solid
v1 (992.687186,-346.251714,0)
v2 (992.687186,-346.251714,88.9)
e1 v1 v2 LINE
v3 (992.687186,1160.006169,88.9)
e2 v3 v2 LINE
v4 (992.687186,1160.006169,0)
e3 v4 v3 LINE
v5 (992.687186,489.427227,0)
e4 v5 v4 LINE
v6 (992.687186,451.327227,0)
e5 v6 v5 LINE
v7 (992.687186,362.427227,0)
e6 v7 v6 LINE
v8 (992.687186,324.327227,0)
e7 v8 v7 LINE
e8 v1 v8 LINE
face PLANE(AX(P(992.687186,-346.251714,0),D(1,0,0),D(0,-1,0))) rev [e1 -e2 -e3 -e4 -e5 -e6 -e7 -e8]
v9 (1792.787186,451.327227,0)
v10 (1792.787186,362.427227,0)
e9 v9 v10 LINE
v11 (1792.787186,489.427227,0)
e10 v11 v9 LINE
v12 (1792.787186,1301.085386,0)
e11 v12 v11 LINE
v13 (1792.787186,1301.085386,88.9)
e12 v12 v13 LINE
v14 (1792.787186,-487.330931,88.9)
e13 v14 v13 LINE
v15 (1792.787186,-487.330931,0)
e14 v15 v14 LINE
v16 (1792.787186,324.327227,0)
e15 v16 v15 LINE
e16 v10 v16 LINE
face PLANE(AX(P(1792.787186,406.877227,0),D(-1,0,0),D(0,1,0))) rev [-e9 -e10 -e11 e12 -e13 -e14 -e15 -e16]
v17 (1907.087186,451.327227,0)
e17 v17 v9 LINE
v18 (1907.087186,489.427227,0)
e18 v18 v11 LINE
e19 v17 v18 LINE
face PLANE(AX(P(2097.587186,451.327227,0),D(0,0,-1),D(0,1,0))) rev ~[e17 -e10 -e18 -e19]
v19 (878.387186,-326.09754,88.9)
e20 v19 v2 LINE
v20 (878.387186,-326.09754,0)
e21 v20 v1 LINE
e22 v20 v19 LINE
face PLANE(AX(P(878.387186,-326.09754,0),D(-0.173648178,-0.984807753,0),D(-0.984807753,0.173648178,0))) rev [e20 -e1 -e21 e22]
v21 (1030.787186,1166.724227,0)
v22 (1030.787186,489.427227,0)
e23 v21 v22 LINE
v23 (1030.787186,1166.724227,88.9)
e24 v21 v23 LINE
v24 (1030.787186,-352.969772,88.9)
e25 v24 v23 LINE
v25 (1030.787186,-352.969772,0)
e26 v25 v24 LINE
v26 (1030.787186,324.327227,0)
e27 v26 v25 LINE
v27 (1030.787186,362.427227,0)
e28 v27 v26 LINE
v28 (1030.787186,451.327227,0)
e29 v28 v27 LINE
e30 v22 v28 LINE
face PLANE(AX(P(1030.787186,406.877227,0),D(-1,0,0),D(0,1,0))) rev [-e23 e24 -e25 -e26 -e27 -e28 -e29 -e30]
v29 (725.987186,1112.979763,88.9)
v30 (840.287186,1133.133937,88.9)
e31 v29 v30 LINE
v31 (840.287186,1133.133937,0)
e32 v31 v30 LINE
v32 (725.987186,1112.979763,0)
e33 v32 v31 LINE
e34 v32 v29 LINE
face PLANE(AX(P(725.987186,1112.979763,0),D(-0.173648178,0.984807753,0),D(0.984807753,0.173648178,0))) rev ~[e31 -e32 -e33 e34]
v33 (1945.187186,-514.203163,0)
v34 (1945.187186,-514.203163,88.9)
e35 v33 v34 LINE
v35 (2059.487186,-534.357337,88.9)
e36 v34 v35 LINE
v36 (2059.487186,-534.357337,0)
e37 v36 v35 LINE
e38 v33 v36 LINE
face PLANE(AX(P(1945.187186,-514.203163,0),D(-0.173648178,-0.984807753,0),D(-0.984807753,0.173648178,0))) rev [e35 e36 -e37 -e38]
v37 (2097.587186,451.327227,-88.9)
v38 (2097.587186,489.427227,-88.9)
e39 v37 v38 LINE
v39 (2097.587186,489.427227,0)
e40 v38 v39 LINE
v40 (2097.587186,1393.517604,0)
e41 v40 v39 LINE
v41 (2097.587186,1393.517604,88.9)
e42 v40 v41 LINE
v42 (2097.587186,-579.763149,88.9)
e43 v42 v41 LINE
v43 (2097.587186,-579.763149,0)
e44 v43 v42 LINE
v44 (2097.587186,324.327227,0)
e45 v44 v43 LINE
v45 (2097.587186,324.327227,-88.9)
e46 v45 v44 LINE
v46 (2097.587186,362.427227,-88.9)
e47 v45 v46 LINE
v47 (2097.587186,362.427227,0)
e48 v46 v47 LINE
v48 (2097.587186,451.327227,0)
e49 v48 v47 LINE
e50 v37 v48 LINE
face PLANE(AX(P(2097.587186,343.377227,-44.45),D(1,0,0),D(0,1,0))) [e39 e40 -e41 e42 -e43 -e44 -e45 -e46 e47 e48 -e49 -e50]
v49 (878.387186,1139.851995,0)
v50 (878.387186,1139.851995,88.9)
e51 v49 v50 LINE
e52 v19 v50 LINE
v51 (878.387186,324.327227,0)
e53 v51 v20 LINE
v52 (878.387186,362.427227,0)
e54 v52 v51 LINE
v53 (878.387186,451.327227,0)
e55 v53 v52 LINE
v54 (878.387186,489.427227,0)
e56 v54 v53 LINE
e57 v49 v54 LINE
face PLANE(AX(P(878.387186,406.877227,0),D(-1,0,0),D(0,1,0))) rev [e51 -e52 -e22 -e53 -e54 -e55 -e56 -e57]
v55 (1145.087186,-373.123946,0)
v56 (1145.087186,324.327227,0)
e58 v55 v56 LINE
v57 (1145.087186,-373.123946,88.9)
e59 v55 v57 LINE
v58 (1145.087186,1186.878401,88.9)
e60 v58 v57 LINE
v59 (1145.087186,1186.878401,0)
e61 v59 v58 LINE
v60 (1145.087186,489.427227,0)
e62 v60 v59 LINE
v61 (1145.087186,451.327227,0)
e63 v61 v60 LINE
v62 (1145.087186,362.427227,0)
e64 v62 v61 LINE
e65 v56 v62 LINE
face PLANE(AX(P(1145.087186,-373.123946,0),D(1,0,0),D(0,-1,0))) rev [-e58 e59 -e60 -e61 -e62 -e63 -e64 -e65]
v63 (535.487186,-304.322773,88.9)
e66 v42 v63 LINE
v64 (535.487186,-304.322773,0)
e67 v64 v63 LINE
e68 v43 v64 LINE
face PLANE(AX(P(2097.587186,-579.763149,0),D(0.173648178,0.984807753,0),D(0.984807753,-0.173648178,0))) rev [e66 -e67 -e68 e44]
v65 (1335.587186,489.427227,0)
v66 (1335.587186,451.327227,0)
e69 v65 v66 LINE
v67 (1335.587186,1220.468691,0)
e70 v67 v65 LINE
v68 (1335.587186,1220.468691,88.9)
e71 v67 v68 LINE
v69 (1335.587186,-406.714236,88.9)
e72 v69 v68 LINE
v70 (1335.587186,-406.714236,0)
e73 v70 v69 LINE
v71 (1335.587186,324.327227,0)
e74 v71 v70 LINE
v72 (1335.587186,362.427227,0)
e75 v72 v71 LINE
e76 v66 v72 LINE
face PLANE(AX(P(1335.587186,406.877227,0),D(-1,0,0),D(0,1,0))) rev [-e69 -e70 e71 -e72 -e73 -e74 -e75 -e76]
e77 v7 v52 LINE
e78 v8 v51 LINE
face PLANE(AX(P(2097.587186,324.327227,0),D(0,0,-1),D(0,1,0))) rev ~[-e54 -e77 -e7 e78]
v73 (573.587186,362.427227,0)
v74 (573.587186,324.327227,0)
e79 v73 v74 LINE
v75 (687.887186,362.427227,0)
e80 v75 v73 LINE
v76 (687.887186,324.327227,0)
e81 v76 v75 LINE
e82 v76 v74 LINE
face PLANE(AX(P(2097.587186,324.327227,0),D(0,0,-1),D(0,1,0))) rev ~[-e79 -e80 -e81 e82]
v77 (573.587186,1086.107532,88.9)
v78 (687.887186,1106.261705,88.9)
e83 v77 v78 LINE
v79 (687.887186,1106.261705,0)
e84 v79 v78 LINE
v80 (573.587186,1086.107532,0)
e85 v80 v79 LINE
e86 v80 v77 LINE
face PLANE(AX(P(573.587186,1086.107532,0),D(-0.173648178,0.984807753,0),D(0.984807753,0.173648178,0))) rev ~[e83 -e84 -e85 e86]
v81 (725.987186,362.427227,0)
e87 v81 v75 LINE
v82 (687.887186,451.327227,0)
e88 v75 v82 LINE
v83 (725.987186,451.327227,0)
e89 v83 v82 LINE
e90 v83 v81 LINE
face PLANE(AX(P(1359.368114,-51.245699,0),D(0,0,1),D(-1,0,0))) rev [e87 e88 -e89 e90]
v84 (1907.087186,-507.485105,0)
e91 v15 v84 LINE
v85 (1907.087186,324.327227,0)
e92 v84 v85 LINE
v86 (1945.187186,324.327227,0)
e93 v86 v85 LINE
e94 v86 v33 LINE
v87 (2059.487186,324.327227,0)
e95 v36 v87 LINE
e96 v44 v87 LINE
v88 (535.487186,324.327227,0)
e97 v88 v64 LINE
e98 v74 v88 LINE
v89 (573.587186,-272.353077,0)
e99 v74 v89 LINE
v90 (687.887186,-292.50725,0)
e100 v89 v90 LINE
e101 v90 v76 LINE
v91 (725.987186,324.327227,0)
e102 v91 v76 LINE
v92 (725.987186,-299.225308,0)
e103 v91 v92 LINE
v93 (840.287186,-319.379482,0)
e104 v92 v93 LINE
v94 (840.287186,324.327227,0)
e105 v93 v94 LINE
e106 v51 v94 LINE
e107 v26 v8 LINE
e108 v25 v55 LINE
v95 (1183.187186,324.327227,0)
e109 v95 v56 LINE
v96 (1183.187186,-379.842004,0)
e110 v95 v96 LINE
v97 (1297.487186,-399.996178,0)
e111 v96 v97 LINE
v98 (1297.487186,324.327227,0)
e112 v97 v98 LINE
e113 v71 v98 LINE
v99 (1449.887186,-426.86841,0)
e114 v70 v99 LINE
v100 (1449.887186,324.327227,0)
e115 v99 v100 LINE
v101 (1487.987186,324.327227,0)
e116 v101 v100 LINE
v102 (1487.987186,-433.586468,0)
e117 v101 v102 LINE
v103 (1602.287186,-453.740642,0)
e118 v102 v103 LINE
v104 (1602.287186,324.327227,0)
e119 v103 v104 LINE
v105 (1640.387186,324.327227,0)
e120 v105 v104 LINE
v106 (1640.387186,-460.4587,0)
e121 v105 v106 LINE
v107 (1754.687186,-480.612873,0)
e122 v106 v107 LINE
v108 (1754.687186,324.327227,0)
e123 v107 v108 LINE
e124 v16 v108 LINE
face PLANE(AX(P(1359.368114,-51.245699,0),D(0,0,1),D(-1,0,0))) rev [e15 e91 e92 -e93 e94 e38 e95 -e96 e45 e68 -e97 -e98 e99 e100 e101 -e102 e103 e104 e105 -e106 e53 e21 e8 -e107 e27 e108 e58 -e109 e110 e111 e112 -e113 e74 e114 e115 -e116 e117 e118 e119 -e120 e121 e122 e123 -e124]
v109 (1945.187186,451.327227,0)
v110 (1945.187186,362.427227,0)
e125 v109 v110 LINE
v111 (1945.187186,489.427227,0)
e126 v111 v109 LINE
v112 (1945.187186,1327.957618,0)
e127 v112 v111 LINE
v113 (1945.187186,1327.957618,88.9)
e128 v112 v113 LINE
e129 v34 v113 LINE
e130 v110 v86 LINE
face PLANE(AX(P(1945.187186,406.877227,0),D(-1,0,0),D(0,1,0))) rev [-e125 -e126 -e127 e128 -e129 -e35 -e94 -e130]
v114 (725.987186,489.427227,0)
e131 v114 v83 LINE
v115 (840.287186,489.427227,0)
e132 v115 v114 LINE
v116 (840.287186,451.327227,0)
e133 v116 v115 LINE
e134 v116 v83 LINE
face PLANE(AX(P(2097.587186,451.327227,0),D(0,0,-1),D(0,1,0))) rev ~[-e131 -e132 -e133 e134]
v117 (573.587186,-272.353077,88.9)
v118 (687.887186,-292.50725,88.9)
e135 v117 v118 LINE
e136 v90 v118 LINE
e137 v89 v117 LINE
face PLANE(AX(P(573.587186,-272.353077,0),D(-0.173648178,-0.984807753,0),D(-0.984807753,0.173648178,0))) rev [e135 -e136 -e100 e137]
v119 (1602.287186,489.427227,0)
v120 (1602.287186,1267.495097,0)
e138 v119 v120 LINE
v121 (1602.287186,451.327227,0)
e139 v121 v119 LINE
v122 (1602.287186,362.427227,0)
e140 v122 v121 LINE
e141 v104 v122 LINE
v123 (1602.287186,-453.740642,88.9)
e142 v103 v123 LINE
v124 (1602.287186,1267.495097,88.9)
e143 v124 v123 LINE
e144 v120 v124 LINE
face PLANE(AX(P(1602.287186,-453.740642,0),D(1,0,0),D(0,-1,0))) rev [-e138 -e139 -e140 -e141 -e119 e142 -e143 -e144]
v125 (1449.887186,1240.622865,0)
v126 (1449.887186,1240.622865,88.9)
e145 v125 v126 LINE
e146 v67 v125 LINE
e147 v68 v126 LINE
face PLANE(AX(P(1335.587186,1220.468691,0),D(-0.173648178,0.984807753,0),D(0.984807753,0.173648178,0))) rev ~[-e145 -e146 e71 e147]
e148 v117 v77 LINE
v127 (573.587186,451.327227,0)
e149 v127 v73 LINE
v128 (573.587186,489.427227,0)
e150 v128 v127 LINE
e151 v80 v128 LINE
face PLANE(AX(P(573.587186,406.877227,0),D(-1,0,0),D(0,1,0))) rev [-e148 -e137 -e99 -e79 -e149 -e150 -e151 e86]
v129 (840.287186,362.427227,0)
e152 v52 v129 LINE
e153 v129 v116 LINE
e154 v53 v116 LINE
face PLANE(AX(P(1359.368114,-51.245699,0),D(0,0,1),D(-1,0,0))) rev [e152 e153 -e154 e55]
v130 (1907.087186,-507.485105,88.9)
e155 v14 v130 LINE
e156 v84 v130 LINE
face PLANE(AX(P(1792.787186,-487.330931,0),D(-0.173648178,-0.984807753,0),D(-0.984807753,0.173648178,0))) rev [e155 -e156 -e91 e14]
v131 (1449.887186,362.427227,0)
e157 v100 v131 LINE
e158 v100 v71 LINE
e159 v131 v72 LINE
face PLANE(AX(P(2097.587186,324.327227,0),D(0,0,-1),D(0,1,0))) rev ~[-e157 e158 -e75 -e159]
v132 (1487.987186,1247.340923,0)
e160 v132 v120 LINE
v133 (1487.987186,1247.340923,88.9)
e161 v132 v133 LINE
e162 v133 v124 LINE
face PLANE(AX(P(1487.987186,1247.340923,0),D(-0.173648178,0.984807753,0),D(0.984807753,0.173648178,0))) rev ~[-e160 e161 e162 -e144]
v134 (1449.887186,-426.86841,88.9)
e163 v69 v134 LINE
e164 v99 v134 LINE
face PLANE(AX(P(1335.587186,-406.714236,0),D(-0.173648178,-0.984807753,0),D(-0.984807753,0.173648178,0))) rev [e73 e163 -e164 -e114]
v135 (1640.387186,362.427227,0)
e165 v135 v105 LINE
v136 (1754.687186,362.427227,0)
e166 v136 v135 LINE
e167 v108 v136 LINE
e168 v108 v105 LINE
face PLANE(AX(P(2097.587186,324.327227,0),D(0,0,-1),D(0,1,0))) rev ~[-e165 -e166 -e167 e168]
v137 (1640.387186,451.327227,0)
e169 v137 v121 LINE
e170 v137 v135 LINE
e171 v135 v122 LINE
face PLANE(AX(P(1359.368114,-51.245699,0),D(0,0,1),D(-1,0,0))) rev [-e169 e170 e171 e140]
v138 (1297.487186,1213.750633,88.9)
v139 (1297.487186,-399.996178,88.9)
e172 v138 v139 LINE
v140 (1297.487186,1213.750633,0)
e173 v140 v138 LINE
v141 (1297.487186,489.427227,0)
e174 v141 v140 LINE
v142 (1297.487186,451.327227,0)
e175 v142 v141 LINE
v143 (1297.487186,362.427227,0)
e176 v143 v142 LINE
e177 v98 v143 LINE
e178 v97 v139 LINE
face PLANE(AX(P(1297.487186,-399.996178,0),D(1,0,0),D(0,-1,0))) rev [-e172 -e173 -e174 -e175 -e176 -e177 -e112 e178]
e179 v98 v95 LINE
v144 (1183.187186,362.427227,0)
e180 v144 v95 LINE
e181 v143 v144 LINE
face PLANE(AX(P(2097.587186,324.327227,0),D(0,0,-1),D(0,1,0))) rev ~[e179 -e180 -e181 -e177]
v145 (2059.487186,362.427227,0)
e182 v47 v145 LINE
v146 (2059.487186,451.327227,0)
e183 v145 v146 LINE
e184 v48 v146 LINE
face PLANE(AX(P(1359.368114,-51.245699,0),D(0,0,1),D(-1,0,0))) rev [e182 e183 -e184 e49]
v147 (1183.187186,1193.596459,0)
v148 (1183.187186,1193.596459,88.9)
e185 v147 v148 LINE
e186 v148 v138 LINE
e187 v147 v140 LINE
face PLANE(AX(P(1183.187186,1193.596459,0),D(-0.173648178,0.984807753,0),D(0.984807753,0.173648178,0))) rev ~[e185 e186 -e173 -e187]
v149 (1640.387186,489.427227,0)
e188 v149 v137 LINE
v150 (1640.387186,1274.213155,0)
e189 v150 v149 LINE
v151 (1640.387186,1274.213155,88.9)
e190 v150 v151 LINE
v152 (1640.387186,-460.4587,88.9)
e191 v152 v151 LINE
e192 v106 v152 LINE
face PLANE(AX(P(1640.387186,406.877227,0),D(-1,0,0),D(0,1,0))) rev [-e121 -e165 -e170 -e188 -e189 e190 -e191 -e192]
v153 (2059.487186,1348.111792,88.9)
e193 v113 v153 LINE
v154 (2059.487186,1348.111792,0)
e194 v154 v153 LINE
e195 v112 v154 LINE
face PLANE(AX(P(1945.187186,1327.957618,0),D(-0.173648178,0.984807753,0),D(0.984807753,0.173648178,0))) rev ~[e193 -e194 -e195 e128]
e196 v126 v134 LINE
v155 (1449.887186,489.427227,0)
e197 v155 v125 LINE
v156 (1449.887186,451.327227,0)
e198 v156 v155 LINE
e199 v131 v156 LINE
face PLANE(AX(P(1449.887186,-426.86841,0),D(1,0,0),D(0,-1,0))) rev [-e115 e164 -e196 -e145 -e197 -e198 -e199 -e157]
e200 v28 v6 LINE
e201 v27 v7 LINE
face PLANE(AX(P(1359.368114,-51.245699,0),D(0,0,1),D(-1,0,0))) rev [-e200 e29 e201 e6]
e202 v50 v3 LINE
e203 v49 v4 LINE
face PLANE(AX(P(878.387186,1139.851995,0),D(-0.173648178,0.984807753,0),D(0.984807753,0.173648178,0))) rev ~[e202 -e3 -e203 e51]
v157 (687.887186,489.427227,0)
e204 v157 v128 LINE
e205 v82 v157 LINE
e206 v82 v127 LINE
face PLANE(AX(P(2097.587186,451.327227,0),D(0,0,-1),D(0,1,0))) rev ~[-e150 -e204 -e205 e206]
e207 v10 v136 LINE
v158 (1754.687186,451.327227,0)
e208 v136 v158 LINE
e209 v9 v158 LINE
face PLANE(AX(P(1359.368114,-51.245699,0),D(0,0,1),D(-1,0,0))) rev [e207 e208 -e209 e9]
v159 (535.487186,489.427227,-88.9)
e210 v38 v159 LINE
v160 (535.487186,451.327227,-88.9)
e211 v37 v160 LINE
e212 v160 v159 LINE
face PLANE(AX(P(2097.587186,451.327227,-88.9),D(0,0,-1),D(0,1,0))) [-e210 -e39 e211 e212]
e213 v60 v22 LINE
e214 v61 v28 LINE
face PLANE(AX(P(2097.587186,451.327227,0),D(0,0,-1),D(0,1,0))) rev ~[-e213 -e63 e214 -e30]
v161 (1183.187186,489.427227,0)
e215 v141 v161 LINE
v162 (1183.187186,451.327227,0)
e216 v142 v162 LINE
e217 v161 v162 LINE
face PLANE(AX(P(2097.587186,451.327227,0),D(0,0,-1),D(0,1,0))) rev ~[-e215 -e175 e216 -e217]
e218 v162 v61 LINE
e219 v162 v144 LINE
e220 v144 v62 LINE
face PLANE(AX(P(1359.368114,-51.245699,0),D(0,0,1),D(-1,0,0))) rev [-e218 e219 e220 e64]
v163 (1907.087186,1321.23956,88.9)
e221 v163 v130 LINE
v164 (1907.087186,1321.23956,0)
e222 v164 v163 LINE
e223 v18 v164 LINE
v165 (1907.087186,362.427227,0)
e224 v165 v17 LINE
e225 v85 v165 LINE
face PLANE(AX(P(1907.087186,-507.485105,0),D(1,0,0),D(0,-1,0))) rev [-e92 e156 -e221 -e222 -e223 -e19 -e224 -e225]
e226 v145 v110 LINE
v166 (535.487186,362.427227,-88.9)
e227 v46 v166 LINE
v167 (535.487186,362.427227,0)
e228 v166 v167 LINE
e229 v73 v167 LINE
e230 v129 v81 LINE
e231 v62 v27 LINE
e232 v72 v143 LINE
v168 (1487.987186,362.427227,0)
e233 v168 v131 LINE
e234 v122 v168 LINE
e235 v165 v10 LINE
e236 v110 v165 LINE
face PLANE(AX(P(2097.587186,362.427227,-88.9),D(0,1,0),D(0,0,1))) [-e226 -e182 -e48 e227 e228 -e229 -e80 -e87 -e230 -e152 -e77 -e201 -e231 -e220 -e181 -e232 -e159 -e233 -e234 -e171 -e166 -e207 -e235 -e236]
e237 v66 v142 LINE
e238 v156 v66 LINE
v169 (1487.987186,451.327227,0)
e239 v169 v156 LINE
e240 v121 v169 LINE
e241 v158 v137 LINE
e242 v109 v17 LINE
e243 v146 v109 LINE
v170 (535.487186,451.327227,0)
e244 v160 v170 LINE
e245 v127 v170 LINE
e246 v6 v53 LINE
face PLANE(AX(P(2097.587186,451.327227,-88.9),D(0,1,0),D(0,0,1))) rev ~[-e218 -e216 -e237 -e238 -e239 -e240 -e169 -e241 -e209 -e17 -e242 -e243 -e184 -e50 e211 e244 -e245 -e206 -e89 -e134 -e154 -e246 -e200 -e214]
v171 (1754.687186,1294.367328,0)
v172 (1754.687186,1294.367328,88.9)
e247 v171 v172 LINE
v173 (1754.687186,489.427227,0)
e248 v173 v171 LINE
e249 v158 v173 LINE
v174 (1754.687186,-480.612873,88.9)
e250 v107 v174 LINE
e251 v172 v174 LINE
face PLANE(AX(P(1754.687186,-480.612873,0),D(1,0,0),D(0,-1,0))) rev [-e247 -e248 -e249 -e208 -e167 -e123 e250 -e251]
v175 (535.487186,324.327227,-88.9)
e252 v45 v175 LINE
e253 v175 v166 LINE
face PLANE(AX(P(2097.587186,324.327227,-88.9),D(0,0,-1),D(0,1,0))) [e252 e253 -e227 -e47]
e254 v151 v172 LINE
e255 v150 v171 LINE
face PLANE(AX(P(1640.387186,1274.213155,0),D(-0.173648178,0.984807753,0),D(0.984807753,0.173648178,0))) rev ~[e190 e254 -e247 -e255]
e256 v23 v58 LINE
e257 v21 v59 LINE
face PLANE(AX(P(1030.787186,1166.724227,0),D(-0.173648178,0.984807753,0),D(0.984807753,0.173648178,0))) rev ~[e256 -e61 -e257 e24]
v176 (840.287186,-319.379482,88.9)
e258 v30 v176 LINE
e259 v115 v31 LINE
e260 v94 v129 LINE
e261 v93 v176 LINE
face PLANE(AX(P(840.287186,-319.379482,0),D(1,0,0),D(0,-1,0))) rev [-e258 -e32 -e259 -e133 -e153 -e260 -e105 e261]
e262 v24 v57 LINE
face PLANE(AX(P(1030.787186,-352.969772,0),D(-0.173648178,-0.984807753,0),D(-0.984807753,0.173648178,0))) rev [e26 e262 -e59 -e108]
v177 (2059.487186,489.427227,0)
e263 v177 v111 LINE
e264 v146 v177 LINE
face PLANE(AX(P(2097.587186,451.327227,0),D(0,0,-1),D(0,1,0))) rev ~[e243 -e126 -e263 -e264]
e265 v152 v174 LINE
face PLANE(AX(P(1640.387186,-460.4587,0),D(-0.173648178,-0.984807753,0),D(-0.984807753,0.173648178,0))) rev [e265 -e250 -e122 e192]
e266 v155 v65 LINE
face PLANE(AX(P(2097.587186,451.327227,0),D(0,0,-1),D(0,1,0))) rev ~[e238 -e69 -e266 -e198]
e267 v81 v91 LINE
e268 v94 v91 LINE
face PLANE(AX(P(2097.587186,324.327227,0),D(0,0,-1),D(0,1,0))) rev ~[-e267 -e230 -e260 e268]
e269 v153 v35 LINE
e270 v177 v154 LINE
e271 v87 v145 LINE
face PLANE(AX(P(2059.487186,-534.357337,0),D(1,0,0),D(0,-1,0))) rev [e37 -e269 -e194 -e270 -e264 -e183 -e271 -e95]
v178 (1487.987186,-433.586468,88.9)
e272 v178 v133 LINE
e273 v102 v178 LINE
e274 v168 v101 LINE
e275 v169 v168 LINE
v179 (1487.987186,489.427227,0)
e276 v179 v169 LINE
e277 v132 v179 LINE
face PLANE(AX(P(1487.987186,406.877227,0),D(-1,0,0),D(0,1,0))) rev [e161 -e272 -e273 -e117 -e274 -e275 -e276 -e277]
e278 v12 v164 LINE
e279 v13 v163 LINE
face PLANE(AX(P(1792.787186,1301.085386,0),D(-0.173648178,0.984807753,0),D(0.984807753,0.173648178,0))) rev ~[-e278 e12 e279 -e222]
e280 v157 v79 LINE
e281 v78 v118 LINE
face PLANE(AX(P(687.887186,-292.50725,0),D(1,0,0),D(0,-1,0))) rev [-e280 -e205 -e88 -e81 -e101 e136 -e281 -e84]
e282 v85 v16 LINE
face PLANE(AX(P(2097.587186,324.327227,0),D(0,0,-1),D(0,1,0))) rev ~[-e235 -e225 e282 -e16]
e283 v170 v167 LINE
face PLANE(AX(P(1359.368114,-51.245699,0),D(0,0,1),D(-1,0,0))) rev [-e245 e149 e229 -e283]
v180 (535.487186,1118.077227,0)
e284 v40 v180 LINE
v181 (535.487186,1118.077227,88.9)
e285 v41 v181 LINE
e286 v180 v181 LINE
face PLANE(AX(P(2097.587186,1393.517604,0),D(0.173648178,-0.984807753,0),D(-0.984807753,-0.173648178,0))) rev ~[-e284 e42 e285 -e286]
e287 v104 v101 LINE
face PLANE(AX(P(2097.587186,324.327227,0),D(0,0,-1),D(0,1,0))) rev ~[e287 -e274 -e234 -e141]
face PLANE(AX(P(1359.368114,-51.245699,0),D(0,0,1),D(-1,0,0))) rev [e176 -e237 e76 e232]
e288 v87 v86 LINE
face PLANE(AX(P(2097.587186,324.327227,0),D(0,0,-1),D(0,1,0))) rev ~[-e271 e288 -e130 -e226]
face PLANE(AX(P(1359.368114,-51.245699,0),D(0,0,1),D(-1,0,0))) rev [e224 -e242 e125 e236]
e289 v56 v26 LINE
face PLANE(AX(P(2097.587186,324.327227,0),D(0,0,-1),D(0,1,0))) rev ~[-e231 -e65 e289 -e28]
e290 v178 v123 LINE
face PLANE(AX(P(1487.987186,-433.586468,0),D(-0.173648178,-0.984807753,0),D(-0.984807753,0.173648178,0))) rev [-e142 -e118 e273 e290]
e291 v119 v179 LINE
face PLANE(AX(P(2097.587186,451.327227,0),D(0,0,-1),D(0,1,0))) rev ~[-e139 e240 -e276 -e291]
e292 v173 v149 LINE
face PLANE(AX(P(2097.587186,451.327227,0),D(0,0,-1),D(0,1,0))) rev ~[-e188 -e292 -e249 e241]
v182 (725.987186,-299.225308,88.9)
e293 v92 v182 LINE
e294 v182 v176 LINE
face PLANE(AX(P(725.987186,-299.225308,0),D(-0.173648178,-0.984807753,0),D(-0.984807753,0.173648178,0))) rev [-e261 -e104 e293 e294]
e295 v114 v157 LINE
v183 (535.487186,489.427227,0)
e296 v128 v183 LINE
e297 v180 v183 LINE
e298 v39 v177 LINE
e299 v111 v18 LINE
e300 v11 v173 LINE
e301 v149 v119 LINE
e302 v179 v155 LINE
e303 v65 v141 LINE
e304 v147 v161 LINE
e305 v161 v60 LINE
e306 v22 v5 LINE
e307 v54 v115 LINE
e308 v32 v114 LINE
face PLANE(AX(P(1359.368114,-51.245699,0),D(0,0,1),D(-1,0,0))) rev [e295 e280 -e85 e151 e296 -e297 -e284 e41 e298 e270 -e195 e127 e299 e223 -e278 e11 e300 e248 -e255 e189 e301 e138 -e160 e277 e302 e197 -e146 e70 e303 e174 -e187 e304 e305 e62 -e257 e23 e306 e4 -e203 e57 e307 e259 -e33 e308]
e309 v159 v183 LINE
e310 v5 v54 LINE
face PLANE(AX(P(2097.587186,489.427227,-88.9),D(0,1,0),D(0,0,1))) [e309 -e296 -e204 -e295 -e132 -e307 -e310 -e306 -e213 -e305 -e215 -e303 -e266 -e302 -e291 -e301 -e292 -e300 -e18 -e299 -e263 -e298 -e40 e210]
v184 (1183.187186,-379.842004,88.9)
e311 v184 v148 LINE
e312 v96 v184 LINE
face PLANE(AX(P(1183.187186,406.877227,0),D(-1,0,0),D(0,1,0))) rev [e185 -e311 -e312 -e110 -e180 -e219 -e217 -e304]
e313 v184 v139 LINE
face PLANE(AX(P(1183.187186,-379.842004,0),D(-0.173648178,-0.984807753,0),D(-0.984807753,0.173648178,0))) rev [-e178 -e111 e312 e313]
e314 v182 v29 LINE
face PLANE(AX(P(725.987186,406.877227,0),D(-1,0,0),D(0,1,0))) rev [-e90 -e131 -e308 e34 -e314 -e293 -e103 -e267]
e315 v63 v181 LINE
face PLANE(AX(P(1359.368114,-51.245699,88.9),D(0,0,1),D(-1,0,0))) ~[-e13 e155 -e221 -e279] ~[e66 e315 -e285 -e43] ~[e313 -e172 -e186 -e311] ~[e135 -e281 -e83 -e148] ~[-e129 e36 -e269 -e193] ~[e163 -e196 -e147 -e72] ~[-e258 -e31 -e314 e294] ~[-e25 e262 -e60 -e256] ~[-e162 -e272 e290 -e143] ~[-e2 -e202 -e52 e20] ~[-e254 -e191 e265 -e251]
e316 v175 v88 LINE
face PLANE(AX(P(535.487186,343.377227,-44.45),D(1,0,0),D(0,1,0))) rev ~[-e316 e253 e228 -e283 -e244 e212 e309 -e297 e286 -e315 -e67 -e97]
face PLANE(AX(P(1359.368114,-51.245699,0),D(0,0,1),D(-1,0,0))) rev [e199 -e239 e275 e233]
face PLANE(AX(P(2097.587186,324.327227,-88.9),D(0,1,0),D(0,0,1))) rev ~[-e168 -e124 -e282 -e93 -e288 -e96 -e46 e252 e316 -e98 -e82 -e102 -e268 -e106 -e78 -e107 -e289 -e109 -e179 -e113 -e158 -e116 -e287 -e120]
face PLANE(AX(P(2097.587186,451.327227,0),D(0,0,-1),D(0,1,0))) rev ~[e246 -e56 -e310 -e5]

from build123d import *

# Parameters (mm, degrees)
F1_DEPTH = 88.9
F3_W     = 38.1
F3_H     = 88.9
F4_DEPTH = 1562.1


# Not quite as in the source:
# - a feature names something its author has since deleted; it is built from what else it names


with BuildPart() as f1:
    # F0 (on Top) → F1 (new body)
    with BuildSketch(Plane.XY):
        Polygon((535.4871858596, 1118.0772274703), (535.4871858596, 1079.3894735575), (535.4871858596, 406.8772274703), (573.5871858596, 406.8772274703), (573.5871858596, 1086.1075315225), (687.8871858596, 1106.2617054174), (687.8871858597, 406.8772274703), (725.9871858597, 406.8772274703), (725.9871858596, 1112.9797633824), (840.2871858596, 1133.1339372774), (840.2871858596, 406.8772274703), (878.3871858596, 406.8772274703), (878.3871858596, 1139.8519952424), (992.6871858596, 1160.0061691374), (992.6871858596, 406.8772274703), (1030.7871858596, 406.8772274703), (1030.7871858596, 1166.7242271024), (1145.0871858596, 1186.8784009974), (1145.0871858596, 406.8772274703), (1183.1871858596, 406.8772274703), (1183.1871858596, 1193.5964589624), (1297.4871858596, 1213.7506328574), (1297.4871858596, 406.8772274703), (1335.5871858596, 406.8772274703), (1335.5871858596, 1220.4686908224), (1449.8871858596, 1240.6228647173), (1449.8871858596, 406.8772274703), (1487.9871858596, 406.8772274703), (1487.9871858596, 1247.3409226823), (1602.2871858596, 1267.4950965773), (1602.2871858596, 406.8772274703), (1640.3871858596, 406.8772274703), (1640.3871858596, 1274.2131545423), (1754.6871858596, 1294.3673284373), (1754.6871858596, 406.8772274703), (1792.7871858596, 406.8772274703), (1792.7871858596, 1301.0853864023), (1907.0871858596, 1321.2395602973), (1907.0871858596, 406.8772274703), (1945.1871858596, 406.8772274703), (1945.1871858596, 1327.9576182623), (2059.4871858596, 1348.1117921573), (2059.4871858596, 406.8772274703), (2097.5871858597, 406.8772274703), (2097.5871858596, 1354.8298501222), (2097.5871858596, 1393.5176040351), align=None)
    extrude(amount=F1_DEPTH)

    # F2: F1 across face


with BuildPart() as f1_1:
    add(f1.part)
    add(f1.part.mirror(Plane(origin=(554.5371858596, 406.8772274703, 44.45), x_dir=(1, 0, 0), z_dir=(0, -1, 0))))

    # F3 (on face) → F4 (join, through all)
    with BuildSketch(Plane.YZ.offset(2097.5871858597)):
        with Locations((343.3772274703, -44.45)):
            Rectangle(F3_W, F3_H)
        with Locations((470.3772274703, -44.45)):
            Rectangle(F3_W, F3_H)
    extrude(amount=-F4_DEPTH)


solid = f1_1.part
